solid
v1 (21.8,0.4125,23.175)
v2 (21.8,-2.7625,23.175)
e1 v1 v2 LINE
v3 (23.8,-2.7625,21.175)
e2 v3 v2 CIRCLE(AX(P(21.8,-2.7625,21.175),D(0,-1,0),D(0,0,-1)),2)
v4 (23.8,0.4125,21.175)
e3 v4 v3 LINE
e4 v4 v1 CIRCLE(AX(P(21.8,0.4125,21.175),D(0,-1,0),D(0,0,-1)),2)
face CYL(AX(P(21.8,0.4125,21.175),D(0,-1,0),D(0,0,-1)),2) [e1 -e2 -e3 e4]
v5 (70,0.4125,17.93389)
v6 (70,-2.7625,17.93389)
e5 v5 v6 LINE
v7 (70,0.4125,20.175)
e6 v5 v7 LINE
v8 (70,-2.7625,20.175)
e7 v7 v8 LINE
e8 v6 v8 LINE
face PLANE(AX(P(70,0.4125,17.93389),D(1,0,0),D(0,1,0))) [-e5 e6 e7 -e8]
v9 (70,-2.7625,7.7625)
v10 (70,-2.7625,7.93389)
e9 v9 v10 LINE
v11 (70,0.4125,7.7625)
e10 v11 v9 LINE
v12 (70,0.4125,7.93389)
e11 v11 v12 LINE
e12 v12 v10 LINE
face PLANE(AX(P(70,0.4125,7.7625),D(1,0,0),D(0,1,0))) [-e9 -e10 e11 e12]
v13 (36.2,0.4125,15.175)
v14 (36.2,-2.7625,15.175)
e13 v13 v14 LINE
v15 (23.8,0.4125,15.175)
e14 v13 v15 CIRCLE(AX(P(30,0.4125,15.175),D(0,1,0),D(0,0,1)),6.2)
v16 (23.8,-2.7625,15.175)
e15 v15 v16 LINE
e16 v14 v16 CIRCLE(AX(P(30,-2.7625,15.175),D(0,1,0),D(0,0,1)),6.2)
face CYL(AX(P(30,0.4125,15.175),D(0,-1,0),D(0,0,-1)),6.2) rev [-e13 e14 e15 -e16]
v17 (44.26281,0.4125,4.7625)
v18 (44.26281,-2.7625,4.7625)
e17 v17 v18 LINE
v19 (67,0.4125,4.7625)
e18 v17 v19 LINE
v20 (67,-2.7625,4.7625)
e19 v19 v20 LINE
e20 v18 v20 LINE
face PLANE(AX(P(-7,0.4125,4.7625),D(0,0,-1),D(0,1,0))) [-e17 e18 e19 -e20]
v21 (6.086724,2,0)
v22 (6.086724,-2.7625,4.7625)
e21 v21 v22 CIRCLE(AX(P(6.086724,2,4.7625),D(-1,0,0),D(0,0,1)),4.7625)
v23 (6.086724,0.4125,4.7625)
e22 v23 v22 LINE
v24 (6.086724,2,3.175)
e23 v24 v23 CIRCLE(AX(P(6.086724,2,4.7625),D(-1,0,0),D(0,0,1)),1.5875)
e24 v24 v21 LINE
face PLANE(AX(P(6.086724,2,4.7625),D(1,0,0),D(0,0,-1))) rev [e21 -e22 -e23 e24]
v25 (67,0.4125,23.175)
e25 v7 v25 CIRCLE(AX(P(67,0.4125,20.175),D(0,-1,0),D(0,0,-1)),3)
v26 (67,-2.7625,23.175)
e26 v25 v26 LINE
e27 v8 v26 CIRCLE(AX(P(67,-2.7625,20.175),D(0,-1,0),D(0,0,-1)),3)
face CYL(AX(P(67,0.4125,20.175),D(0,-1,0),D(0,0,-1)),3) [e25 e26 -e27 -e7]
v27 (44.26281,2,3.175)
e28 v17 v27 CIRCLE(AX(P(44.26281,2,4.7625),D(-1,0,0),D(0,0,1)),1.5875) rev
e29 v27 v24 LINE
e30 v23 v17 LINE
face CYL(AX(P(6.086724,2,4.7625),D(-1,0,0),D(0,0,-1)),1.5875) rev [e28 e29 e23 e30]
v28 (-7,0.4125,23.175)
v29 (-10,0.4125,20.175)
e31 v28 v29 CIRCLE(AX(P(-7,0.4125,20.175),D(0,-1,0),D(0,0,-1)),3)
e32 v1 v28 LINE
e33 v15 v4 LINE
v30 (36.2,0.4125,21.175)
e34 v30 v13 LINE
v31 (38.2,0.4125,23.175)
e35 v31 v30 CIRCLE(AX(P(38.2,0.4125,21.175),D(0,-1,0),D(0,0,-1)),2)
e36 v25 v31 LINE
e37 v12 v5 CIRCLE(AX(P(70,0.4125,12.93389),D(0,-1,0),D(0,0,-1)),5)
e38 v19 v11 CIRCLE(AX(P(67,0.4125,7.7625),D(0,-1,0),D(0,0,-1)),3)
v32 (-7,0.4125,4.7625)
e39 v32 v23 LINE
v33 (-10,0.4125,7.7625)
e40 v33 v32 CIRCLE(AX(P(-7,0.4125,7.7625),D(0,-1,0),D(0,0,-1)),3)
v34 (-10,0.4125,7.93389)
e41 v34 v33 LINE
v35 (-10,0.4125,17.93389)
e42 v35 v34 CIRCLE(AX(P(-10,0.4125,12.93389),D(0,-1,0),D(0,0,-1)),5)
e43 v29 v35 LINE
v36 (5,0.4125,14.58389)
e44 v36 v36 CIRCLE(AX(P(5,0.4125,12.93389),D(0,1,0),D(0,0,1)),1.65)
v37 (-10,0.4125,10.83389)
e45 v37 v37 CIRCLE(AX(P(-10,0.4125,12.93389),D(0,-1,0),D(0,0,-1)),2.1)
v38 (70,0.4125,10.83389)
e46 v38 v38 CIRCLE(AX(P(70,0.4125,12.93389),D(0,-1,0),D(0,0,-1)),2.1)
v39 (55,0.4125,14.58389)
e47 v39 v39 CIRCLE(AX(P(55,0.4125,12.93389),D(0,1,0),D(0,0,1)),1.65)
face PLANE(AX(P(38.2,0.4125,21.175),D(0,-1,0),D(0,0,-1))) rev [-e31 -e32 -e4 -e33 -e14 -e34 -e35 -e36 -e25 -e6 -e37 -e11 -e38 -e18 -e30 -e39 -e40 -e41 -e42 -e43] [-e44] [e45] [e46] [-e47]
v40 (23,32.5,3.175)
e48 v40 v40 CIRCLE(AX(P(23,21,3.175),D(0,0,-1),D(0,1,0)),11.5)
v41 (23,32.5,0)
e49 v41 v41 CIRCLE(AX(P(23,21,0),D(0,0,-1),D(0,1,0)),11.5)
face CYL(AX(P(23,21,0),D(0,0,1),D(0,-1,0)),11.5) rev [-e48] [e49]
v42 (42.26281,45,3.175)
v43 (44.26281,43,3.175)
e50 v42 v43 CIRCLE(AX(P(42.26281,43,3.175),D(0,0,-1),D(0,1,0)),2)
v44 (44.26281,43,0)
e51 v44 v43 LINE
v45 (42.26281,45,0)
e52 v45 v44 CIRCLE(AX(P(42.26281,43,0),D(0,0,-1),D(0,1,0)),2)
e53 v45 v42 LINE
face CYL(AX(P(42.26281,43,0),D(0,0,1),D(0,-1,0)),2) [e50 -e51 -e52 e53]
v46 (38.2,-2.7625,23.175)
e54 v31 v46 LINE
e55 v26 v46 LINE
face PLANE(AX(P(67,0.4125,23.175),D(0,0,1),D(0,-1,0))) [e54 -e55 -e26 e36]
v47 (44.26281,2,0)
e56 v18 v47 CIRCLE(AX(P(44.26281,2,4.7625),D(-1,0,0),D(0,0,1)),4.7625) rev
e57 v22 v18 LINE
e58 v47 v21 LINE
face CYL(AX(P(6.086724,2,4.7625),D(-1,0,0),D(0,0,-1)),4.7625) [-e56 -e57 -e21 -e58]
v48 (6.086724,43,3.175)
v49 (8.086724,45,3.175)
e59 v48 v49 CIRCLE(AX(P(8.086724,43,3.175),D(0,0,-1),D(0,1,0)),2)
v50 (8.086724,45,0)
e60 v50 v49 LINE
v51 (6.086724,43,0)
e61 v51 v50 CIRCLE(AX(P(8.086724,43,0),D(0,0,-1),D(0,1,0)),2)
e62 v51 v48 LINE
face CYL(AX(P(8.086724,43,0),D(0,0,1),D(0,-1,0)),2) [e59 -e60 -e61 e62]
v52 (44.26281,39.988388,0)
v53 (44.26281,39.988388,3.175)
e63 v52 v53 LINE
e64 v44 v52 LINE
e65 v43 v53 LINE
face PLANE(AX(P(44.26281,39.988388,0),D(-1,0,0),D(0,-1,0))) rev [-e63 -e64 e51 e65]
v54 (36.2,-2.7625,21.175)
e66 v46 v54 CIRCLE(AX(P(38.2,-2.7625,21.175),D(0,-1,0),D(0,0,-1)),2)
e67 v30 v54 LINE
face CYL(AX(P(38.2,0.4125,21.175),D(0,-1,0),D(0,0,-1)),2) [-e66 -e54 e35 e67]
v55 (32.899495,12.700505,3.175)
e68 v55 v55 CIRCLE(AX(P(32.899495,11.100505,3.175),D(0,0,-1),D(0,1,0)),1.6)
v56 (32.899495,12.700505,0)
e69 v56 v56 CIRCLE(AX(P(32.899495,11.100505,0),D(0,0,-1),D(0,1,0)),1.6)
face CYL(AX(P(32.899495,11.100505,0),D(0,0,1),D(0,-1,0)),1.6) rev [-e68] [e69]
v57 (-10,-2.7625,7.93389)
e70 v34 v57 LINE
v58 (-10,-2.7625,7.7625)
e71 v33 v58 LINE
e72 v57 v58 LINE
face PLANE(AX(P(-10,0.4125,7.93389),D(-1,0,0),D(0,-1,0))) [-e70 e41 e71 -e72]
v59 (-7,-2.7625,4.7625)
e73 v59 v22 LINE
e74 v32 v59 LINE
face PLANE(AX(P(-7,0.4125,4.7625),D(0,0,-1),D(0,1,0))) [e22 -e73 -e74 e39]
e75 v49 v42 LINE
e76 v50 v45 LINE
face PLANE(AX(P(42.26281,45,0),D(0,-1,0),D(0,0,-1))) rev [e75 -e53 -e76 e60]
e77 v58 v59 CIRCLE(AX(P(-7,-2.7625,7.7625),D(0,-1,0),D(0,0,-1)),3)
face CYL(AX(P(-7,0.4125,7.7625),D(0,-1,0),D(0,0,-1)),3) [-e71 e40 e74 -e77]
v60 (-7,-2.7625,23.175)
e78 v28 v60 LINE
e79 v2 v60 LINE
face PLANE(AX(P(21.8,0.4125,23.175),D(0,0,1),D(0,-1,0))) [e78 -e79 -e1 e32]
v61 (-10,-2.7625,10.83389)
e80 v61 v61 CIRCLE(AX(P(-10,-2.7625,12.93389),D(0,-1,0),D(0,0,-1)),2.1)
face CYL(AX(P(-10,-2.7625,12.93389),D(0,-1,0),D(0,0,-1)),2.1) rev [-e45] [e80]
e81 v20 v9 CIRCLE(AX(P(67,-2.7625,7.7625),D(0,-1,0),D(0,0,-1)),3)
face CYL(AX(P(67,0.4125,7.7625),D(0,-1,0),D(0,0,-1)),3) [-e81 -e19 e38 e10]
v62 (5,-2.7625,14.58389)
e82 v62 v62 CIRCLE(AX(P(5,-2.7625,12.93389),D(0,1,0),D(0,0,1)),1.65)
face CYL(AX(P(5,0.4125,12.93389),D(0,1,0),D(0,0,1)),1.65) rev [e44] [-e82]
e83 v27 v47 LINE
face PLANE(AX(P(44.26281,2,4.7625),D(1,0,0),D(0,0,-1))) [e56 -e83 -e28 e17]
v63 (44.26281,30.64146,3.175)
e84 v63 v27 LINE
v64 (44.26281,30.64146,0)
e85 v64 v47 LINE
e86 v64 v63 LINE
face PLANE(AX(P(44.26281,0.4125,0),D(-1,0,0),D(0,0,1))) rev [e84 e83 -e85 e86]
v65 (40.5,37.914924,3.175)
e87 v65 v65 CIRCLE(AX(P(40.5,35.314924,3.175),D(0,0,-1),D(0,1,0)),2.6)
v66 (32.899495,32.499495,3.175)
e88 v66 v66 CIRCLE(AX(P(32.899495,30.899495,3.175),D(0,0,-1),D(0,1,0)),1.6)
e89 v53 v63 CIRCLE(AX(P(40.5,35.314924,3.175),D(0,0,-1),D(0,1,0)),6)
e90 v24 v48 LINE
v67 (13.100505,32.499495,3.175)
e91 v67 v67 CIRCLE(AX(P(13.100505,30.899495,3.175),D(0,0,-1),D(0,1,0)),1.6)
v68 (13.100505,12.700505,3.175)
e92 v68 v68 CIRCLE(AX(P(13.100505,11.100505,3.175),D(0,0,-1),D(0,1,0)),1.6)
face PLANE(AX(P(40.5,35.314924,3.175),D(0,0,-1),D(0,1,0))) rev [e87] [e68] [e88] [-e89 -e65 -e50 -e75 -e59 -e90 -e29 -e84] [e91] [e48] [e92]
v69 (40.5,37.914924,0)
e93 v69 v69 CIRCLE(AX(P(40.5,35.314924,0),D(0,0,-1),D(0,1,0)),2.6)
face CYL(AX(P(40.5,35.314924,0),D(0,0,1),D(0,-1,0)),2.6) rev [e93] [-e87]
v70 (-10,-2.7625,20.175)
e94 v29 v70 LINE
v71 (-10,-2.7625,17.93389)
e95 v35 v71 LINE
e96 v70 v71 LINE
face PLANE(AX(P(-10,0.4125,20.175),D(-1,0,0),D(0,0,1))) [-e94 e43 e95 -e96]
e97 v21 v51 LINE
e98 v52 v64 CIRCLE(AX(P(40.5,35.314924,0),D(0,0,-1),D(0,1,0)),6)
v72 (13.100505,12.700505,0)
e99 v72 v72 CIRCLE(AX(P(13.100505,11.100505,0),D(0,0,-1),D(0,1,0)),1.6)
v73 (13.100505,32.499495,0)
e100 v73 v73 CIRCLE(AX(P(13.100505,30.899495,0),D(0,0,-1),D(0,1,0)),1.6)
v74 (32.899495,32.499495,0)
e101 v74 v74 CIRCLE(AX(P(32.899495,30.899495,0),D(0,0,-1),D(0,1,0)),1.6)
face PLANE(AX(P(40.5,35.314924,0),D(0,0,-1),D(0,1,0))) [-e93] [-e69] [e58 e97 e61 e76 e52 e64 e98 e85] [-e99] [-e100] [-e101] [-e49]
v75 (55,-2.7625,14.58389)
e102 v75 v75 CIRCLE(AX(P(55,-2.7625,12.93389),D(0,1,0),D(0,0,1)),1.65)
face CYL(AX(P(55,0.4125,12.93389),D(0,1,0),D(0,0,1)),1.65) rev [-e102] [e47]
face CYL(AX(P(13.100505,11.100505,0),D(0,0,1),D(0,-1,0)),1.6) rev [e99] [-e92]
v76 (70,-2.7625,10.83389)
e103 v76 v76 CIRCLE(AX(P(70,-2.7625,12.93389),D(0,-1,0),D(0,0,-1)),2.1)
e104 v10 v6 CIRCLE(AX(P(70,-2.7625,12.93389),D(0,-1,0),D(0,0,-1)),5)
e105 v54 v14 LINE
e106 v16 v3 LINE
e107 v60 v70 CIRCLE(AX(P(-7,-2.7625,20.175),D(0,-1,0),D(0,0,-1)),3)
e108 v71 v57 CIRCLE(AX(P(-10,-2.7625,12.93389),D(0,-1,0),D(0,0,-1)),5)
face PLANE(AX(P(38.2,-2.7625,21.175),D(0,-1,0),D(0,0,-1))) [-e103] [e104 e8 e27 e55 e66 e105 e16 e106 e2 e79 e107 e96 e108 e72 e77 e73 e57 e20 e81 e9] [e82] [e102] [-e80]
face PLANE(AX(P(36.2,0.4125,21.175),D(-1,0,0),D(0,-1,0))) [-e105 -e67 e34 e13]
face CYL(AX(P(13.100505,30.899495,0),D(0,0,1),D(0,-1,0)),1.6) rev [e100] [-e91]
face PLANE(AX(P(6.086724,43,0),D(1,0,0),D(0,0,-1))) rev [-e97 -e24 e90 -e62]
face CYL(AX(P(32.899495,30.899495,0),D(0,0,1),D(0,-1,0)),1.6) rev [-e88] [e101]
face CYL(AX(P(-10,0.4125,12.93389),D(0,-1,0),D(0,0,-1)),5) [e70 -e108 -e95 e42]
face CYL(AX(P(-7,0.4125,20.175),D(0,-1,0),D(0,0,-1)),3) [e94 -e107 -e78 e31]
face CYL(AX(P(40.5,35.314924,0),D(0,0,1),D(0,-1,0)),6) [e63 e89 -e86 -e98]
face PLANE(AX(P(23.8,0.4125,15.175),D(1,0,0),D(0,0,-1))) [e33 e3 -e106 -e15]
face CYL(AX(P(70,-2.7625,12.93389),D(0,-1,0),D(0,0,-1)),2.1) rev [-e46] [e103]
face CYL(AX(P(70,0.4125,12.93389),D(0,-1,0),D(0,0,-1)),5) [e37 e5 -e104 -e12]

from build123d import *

# Parameters (mm, degrees)
BASE_FLANGE1_DEPTH         = 3.175
F_4_2_4_2_DIAMETER_HOLE1_D = 4.2
F_3_3_3_3_DIAMETER_HOLE1_D = 3.3
EDGE_FLANGE1_DEPTH         = 38.176085753
EDGE_FLANGE1_START         = 3.175
EDGE_FLANGE1_PROFILE_R     = 1.6
EDGE_FLANGE1_PROFILE_R_2   = 11.5
EDGE_FLANGE1_PROFILE_R_3   = 2.6
EDGE_FLANGE1_FLAT_DEPTH    = 3.175


# Sheet-metal steps are written as plain solids
with BuildPart() as part:
    # Sketch11 → Base-Flange1 (new body)
    with BuildSketch(Plane.XZ.offset(2.7625)):
        with BuildLine():
            Line((36.2, 21.175), (36.2, 15.175))
            ThreePointArc((36.2, 15.175), (30, 8.975), (23.8, 15.175))
            Line((23.8, 15.175), (23.8, 21.175))
            ThreePointArc((23.8, 21.175), (23.214213562, 22.589213562), (21.8, 23.175))
            Line((21.8, 23.175), (-7, 23.175))
            ThreePointArc((-7, 23.175), (-9.121320344, 22.296320344), (-10, 20.175))
            Line((-10, 20.175), (-10, 17.93389))
            ThreePointArc((-10, 17.93389), (-15, 12.93389), (-10, 7.93389))
            Line((-10, 7.93389), (-10, 7.7625))
            ThreePointArc((-10, 7.7625), (-9.121320344, 5.641179656), (-7, 4.7625))
            Line((-7, 4.7625), (67, 4.7625))
            ThreePointArc((67, 4.7625), (69.121320344, 5.641179656), (70, 7.7625))
            Line((70, 7.7625), (70, 7.93389))
            ThreePointArc((70, 7.93389), (75, 12.93389), (70, 17.93389))
            Line((70, 17.93389), (70, 20.175))
            ThreePointArc((70, 20.175), (69.121320344, 22.296320344), (67, 23.175))
            Line((67, 23.175), (38.2, 23.175))
            ThreePointArc((38.2, 23.175), (36.785786438, 22.589213562), (36.2, 21.175))
        make_face()
    extrude(amount=-BASE_FLANGE1_DEPTH)

    # Ø4.2 (4.2) Diameter Hole1 (through all)
    with Locations(Plane(origin=(0, -2.7625, 0), x_dir=(-1, 0, 0), z_dir=(0, -1, 0))):
        with Locations((-70, -12.93389), (10, -12.93389)):
            Hole(F_4_2_4_2_DIAMETER_HOLE1_D / 2)

    # Ø3.3 (3.3) Diameter Hole1 (through all)
    with Locations(Plane(origin=(0, 0.4125, 0), x_dir=(1, 0, 0), z_dir=(0, 1, 0))):
        with Locations((5, -12.93389), (55, -12.93389)):
            Hole(F_3_3_3_3_DIAMETER_HOLE1_D / 2)

    # Edge-Flange1 bend section (across the edge) → Edge-Flange1 (add)
    with BuildSketch(Plane(origin=(44.262809753, 0.4125, 3.175), x_dir=(0, 0, 1), z_dir=(-1, 0, 0))):
        with BuildLine():
            Line((-3.175, 1.5875), (0, 1.5875))
            ThreePointArc((0, 1.5875), (0.464967985, 0.464967985), (1.5875, 0))
            Line((1.5875, 0), (1.5875, -3.175))
            ThreePointArc((1.5875, -3.175), (-1.780096045, -1.780096045), (-3.175, 1.5875))
        make_face()
    extrude(amount=EDGE_FLANGE1_DEPTH)

    # Edge-Flange1 profile (on flange) → Edge-Flange1 flat (add)
    with BuildSketch(Plane(origin=(0, 0.4125, 3.175), x_dir=(-1, 0, 0), z_dir=(0, 0, -1)).offset(EDGE_FLANGE1_START)):
        with BuildLine():
            ThreePointArc((-6.086724, 42.5875), (-6.672510438, 44.001713562), (-8.086724, 44.5875))
            Line((-8.086724, 44.5875), (-42.262809753, 44.5875))
            ThreePointArc((-42.262809753, 44.5875), (-43.677023316, 44.001713562), (-44.262809753, 42.5875))
            Line((-44.262809753, 42.5875), (-44.262809753, 39.575887728))
            ThreePointArc((-44.262809753, 39.575887728), (-46.5, 34.902424049), (-44.262809753, 30.22896037))
            Line((-44.262809753, 30.22896037), (-44.262809753, 1.5875))
            Line((-44.262809753, 1.5875), (-6.086724, 1.5875))
            Line((-6.086724, 1.5875), (-6.086724, 42.5875))
        make_face()
        with Locations((-13.100505063, 10.688005063)):
            Circle(EDGE_FLANGE1_PROFILE_R, mode=Mode.SUBTRACT)
        with Locations((-23, 20.5875)):
            Circle(EDGE_FLANGE1_PROFILE_R_2, mode=Mode.SUBTRACT)
        with Locations((-32.899494937, 10.688005063)):
            Circle(EDGE_FLANGE1_PROFILE_R, mode=Mode.SUBTRACT)
        with Locations((-13.100505063, 30.486994937)):
            Circle(EDGE_FLANGE1_PROFILE_R, mode=Mode.SUBTRACT)
        with Locations((-32.899494937, 30.486994937)):
            Circle(EDGE_FLANGE1_PROFILE_R, mode=Mode.SUBTRACT)
        with Locations((-40.5, 34.902424049)):
            Circle(EDGE_FLANGE1_PROFILE_R_3, mode=Mode.SUBTRACT)
    extrude(amount=-EDGE_FLANGE1_FLAT_DEPTH)


solid = part.part
